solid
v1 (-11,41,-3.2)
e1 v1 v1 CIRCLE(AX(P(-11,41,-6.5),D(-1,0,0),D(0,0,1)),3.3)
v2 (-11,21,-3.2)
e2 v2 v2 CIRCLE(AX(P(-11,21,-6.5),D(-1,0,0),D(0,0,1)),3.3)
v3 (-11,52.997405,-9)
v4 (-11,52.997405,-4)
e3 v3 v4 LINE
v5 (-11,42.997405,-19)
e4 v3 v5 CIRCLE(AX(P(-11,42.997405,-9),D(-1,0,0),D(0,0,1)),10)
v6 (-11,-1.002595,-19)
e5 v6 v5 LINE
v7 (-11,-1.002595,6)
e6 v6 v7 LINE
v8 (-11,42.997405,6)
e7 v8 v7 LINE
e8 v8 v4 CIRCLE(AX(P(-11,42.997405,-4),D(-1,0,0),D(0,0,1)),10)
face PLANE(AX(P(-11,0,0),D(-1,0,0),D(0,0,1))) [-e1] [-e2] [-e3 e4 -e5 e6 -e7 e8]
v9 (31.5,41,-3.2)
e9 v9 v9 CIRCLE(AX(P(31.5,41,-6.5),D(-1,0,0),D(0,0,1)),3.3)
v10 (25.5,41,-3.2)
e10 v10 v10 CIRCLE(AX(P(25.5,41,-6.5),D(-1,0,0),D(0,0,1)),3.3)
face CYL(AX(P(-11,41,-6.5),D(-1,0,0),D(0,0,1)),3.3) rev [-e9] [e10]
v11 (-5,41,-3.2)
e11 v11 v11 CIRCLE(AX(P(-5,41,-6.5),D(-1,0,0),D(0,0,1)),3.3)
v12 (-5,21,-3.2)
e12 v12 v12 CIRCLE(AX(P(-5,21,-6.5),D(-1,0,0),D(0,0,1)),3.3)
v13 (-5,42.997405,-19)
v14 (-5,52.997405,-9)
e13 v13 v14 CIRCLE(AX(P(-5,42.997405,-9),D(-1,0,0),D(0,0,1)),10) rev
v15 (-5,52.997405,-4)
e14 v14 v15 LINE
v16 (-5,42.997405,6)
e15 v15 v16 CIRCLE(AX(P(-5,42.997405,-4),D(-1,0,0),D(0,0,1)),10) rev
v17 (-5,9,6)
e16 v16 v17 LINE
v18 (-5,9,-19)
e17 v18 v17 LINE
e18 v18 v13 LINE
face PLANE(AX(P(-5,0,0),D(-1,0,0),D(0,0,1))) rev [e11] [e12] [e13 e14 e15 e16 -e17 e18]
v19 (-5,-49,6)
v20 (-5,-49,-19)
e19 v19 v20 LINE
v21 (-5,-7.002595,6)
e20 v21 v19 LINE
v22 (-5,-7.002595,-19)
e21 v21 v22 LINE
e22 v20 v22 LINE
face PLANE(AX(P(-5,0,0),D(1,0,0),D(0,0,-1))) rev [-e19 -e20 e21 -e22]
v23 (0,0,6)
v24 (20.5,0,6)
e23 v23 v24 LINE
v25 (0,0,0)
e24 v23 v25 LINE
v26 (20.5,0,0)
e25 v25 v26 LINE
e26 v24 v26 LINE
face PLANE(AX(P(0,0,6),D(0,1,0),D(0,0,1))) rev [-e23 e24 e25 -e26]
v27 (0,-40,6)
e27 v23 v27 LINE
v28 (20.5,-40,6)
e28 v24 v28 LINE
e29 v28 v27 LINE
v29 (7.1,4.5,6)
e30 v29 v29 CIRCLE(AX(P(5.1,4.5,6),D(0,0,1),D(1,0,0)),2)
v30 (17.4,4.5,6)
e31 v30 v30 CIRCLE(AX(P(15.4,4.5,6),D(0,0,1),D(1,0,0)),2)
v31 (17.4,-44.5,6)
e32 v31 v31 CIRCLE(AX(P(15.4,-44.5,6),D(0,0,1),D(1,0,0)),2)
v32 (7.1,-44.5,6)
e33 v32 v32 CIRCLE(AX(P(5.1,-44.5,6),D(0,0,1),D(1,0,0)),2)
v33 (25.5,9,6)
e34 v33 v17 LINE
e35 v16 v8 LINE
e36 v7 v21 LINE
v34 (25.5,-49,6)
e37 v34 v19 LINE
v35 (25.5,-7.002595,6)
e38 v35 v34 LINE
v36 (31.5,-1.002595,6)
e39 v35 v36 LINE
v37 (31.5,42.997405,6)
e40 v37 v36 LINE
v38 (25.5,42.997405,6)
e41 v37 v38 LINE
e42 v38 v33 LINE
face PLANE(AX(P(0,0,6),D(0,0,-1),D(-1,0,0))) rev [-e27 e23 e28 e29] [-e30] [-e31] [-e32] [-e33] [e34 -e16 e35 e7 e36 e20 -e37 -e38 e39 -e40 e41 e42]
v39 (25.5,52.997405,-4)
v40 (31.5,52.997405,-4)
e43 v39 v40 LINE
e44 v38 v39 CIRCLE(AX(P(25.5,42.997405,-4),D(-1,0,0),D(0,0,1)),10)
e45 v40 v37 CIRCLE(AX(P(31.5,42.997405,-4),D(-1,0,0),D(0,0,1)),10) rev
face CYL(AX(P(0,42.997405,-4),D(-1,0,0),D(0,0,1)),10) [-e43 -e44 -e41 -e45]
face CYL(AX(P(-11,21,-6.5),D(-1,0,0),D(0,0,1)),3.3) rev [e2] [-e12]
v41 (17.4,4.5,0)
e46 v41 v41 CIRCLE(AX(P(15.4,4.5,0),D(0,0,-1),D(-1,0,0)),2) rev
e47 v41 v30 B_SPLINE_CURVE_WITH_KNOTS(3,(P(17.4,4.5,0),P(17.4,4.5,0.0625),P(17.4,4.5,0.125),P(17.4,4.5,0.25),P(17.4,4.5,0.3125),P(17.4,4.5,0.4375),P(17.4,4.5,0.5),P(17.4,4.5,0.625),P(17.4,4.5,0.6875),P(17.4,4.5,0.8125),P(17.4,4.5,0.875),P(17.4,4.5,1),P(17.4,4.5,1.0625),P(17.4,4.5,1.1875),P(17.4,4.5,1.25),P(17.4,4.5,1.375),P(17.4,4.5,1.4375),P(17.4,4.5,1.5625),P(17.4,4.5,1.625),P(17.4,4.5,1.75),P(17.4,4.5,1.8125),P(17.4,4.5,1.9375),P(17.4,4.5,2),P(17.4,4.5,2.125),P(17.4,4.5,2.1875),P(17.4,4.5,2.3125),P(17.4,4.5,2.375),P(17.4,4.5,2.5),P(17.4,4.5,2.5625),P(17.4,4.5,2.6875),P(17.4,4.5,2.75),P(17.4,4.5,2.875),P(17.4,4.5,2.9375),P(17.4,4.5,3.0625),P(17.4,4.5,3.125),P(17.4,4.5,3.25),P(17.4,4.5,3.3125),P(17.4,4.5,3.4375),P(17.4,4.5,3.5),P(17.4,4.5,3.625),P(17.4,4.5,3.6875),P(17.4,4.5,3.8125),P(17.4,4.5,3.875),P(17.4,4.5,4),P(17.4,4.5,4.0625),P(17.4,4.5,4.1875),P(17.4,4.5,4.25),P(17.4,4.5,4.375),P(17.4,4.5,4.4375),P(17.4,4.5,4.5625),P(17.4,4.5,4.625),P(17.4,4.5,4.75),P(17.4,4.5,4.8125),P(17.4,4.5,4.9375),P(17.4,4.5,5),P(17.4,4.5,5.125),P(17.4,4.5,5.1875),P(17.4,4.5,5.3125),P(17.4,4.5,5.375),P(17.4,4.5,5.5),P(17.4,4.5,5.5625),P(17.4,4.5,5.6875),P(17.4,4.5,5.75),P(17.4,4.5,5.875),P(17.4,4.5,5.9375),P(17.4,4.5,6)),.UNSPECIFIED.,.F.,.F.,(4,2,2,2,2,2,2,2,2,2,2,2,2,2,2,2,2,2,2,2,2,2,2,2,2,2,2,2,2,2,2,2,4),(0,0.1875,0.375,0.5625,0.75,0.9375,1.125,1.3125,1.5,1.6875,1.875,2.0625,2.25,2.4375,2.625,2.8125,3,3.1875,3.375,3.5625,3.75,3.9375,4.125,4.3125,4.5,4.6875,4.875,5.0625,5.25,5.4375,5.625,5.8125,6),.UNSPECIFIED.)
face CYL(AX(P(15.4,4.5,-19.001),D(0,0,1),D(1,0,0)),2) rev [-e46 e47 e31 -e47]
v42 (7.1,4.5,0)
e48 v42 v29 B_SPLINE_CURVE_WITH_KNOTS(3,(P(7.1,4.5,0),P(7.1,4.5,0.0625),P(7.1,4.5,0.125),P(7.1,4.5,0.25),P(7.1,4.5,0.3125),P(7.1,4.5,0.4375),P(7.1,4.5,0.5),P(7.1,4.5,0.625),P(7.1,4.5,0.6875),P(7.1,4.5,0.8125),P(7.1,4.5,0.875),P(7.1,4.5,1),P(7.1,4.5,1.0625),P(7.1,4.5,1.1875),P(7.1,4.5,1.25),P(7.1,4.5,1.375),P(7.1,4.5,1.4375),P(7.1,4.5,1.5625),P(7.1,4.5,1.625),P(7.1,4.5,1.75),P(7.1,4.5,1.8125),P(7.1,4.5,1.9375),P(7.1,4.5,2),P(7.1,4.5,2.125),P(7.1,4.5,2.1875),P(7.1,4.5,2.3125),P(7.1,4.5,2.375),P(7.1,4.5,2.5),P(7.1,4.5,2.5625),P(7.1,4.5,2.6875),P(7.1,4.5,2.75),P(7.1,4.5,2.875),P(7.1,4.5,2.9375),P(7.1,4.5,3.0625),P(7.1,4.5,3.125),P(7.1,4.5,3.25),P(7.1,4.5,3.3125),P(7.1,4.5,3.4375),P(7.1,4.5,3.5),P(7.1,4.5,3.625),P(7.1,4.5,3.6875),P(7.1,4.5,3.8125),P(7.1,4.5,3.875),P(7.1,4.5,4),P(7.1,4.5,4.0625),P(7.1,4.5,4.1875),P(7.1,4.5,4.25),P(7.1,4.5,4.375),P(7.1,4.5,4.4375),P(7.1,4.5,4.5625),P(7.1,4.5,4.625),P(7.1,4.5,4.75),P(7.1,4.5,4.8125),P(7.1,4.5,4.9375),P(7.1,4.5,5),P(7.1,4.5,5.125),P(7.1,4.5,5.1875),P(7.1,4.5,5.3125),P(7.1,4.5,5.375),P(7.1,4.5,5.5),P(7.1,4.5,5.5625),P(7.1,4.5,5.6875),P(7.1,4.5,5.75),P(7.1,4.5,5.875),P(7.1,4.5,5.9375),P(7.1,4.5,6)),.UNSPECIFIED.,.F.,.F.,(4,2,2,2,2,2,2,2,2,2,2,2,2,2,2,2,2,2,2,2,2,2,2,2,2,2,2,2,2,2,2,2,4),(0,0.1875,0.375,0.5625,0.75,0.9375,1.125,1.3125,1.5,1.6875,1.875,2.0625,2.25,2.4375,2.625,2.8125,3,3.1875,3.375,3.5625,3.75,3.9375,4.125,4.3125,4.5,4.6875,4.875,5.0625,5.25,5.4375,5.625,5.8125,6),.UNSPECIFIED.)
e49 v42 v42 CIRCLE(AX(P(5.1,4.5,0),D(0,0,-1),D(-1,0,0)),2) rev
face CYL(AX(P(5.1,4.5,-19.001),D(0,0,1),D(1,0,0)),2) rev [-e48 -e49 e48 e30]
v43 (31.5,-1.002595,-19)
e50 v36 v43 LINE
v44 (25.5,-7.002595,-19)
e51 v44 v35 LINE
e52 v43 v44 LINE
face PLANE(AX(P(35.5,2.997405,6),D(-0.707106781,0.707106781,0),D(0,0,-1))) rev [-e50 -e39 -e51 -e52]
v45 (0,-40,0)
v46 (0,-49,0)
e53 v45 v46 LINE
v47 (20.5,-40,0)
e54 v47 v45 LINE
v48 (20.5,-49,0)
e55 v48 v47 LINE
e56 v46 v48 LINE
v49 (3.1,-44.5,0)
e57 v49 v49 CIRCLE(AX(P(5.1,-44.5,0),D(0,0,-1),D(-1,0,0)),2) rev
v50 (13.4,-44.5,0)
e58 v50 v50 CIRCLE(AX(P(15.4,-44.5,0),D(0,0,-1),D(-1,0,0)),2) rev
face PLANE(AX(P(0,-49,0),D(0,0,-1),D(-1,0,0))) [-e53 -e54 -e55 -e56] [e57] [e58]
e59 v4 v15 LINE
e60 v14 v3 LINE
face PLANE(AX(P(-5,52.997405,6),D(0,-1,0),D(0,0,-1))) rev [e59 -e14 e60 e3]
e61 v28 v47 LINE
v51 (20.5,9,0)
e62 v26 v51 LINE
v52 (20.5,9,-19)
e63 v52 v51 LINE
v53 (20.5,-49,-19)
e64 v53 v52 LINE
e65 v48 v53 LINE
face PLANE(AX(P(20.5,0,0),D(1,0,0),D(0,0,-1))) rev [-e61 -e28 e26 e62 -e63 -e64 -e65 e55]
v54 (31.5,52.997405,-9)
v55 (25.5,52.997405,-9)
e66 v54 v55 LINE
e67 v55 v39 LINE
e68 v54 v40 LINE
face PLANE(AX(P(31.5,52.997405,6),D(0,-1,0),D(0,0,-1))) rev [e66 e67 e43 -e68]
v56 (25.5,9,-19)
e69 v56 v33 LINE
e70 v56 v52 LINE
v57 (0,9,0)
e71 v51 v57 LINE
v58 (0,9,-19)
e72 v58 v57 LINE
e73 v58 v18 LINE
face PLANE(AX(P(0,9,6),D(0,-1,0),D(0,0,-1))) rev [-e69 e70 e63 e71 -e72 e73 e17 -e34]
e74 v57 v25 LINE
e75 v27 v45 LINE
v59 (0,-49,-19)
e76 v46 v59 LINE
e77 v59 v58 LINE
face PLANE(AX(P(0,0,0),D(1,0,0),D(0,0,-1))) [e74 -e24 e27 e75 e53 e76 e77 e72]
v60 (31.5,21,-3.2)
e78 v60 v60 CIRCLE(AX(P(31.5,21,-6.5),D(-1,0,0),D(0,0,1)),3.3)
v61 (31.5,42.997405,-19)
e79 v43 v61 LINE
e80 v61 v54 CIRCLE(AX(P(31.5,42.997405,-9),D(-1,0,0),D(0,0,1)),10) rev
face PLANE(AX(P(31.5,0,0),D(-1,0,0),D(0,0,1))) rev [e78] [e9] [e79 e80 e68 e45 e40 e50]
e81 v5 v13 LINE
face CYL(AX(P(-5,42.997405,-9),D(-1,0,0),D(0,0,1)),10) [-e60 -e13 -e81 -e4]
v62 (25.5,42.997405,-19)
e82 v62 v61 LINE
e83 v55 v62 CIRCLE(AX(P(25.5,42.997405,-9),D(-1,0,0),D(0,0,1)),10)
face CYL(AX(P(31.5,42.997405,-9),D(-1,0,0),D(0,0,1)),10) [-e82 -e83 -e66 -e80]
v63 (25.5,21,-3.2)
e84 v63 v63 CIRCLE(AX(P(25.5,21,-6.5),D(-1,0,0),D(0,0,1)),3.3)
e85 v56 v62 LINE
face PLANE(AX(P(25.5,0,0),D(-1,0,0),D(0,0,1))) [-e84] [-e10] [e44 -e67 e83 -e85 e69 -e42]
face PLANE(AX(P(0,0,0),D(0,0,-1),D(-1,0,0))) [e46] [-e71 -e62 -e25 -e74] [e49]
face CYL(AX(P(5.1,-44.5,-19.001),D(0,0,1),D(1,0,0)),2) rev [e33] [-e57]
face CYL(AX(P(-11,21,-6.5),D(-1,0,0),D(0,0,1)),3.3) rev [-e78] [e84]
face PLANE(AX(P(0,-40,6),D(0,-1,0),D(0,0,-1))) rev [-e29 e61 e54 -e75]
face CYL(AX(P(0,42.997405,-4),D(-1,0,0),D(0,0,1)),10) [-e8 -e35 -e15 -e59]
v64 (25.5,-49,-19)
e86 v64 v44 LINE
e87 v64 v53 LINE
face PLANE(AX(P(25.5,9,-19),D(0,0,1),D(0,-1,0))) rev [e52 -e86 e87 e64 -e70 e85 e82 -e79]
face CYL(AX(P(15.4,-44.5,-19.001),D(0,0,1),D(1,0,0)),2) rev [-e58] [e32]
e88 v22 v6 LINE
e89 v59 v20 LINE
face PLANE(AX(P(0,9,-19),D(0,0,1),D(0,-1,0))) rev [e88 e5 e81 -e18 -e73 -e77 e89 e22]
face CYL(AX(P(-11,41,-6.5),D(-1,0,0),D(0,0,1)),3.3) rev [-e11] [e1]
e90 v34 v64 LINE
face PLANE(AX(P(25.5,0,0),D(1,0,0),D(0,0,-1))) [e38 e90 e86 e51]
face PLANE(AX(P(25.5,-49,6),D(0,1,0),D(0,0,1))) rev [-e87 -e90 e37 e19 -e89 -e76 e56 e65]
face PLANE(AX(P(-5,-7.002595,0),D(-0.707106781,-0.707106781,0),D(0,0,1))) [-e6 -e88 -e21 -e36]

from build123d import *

# Parameters (mm, degrees)
SKETCH1_W            = 20.5
SKETCH1_H            = 9
BOSS_EXTRUDE1_DEPTH  = 6
SKETCH2_W            = 25
SKETCH2_H            = 58
BOSS_EXTRUDE2_DEPTH  = 5
LPATTERN1_COUNT      = 2
LPATTERN1_PITCH      = 49
LPATTERN2_COUNT      = 2
LPATTERN2_PITCH      = 25.5
CUT_EXTRUDE1_REACH   = 62.632
SKETCH3_R            = 2
LPATTERN3_COUNT      = 2
LPATTERN3_PITCH      = 10.3
LPATTERN3_COUNT_DIR2 = 2
LPATTERN3_PITCH_DIR2 = 49
SKETCH8_W            = 25
SKETCH8_H            = 50
BOSS_EXTRUDE3_DEPTH  = 6
LPATTERN4_COUNT      = 2
LPATTERN4_PITCH      = 36.5
M6_CLEARANCE_HOLE1_D = 6.6
CHAMFER2_SIZE        = 10
LPATTERN5_COUNT      = 2
LPATTERN5_PITCH      = 20
FILLET1_R            = 10


with BuildPart() as part:
    # Sketch1 → Boss-Extrude1 (new body)
    with BuildSketch(Plane.XY):
        with Locations((10.25, 4.5)):
            Rectangle(SKETCH1_W, SKETCH1_H)
    boss_extrude1 = extrude(amount=BOSS_EXTRUDE1_DEPTH)

    # Sketch2 → Boss-Extrude2 (add)
    with BuildSketch(Plane(origin=(20.5, 0, 0), x_dir=(0, 0, -1), z_dir=(1, 0, 0))):
        with Locations((6.5, -20)):
            Rectangle(SKETCH2_W, SKETCH2_H)
    boss_extrude2 = extrude(amount=BOSS_EXTRUDE2_DEPTH)

    # LPattern1: Boss-Extrude1 ×2
    with Locations(*[(0, -i * LPATTERN1_PITCH, 0) for i in range(1, LPATTERN1_COUNT)]):
        add(boss_extrude1)

    # LPattern2: Boss-Extrude2 ×2
    with Locations(*[(-i * LPATTERN2_PITCH, 0, 0) for i in range(1, LPATTERN2_COUNT)]):
        add(boss_extrude2)

    # Sketch3 → Cut-Extrude1 (cut, up to next)
    with BuildSketch(Plane.XY.offset(6), mode=Mode.PRIVATE) as cut_extrude1_sk1:
        with Locations((5.1, 4.5)):
            Circle(SKETCH3_R)
    cut_extrude1_tool1 = extrude(cut_extrude1_sk1.sketch, amount=-CUT_EXTRUDE1_REACH, mode=Mode.PRIVATE) & part.part
    cut_extrude1 = cut_extrude1_tool1.solids().sort_by_distance((5.1, 4.5, 6))[0]
    add(cut_extrude1, mode=Mode.SUBTRACT)

    # LPattern3: Cut-Extrude1 2 × 2
    with Locations(*[(i * LPATTERN3_PITCH, -j * LPATTERN3_PITCH_DIR2, 0) for i in range(LPATTERN3_COUNT) for j in range(LPATTERN3_COUNT_DIR2) if (i, j) != (0, 0)]):
        add(cut_extrude1, mode=Mode.SUBTRACT)

    # Sketch8 → Boss-Extrude3 (add)
    with BuildSketch(Plane(origin=(25.5, 0, 0), x_dir=(0, 0, -1), z_dir=(1, 0, 0))):
        with Locations((6.5, 27.997404855)):
            Rectangle(SKETCH8_W, SKETCH8_H)
    boss_extrude3 = extrude(amount=BOSS_EXTRUDE3_DEPTH)

    # LPattern4: Boss-Extrude3 ×2
    with Locations(*[(-i * LPATTERN4_PITCH, 0, 0) for i in range(1, LPATTERN4_COUNT)]):
        add(boss_extrude3)

    # M6 Clearance Hole1 (through all)
    with Locations(Plane.ZY.offset(11)):
        with Locations((-6.5, 21)):
            m6_clearance_hole1 = Hole(M6_CLEARANCE_HOLE1_D / 2)

    # Chamfer2
    # the kernel refuses this chamfer: 10 mm, written as the material it adds along each edge
    with BuildSketch(Plane(origin=(-5, 2.997404855, 6), x_dir=(-0.9996219169112968, 0.027495876610586403, 0), z_dir=(0, 0, -1))) as chamfer2_piece_1_section:
        Polygon((CHAMFER2_SIZE * 0.999621916911, -CHAMFER2_SIZE * 0.0274958766106), (-CHAMFER2_SIZE * 0.0274958766106, -CHAMFER2_SIZE * 0.999621916911), (0, 0), align=None)
    chamfer2_piece_1 = extrude(amount=25, mode=Mode.PRIVATE)
    chamfer2_piece_1 = split(chamfer2_piece_1, bisect_by=Plane(origin=(-11, -0.75268974, -6.5), z_dir=(1, 0, 0)), keep=Keep.TOP, mode=Mode.PRIVATE)
    add(chamfer2_piece_1)
    with BuildSketch(Plane(origin=(25.5, 2.997404855, 6), x_dir=(-0.02749587661058666, -0.9996219169112968, 0), z_dir=(0, 0, -1))) as chamfer2_piece_2_section:
        Polygon((CHAMFER2_SIZE * 0.999621916911, -CHAMFER2_SIZE * 0.0274958766106), (-CHAMFER2_SIZE * 0.0274958766106, -CHAMFER2_SIZE * 0.999621916911), (0, 0), align=None)
    chamfer2_piece_2 = extrude(amount=25, mode=Mode.PRIVATE)
    chamfer2_piece_2 = split(chamfer2_piece_2, bisect_by=Plane(origin=(31.5, -0.75268974, -6.5), z_dir=(-1, 0, 0)), keep=Keep.TOP, mode=Mode.PRIVATE)
    add(chamfer2_piece_2)

    # LPattern5: M6 Clearance Hole1 ×2
    with Locations(*[(0, i * LPATTERN5_PITCH, 0) for i in range(1, LPATTERN5_COUNT)]):
        add(m6_clearance_hole1, mode=Mode.SUBTRACT)

    # Fillet1
    fillet1_edges = [part.edges().sort_by_distance(p)[0] for p in [
        (28.5, 52.997404855, 6),
        (28.5, 52.997404855, -19),
        (-8, 52.997404855, 6),
        (-8, 52.997404855, -19),
    ]]
    fillet(fillet1_edges, radius=FILLET1_R)


solid = part.part
